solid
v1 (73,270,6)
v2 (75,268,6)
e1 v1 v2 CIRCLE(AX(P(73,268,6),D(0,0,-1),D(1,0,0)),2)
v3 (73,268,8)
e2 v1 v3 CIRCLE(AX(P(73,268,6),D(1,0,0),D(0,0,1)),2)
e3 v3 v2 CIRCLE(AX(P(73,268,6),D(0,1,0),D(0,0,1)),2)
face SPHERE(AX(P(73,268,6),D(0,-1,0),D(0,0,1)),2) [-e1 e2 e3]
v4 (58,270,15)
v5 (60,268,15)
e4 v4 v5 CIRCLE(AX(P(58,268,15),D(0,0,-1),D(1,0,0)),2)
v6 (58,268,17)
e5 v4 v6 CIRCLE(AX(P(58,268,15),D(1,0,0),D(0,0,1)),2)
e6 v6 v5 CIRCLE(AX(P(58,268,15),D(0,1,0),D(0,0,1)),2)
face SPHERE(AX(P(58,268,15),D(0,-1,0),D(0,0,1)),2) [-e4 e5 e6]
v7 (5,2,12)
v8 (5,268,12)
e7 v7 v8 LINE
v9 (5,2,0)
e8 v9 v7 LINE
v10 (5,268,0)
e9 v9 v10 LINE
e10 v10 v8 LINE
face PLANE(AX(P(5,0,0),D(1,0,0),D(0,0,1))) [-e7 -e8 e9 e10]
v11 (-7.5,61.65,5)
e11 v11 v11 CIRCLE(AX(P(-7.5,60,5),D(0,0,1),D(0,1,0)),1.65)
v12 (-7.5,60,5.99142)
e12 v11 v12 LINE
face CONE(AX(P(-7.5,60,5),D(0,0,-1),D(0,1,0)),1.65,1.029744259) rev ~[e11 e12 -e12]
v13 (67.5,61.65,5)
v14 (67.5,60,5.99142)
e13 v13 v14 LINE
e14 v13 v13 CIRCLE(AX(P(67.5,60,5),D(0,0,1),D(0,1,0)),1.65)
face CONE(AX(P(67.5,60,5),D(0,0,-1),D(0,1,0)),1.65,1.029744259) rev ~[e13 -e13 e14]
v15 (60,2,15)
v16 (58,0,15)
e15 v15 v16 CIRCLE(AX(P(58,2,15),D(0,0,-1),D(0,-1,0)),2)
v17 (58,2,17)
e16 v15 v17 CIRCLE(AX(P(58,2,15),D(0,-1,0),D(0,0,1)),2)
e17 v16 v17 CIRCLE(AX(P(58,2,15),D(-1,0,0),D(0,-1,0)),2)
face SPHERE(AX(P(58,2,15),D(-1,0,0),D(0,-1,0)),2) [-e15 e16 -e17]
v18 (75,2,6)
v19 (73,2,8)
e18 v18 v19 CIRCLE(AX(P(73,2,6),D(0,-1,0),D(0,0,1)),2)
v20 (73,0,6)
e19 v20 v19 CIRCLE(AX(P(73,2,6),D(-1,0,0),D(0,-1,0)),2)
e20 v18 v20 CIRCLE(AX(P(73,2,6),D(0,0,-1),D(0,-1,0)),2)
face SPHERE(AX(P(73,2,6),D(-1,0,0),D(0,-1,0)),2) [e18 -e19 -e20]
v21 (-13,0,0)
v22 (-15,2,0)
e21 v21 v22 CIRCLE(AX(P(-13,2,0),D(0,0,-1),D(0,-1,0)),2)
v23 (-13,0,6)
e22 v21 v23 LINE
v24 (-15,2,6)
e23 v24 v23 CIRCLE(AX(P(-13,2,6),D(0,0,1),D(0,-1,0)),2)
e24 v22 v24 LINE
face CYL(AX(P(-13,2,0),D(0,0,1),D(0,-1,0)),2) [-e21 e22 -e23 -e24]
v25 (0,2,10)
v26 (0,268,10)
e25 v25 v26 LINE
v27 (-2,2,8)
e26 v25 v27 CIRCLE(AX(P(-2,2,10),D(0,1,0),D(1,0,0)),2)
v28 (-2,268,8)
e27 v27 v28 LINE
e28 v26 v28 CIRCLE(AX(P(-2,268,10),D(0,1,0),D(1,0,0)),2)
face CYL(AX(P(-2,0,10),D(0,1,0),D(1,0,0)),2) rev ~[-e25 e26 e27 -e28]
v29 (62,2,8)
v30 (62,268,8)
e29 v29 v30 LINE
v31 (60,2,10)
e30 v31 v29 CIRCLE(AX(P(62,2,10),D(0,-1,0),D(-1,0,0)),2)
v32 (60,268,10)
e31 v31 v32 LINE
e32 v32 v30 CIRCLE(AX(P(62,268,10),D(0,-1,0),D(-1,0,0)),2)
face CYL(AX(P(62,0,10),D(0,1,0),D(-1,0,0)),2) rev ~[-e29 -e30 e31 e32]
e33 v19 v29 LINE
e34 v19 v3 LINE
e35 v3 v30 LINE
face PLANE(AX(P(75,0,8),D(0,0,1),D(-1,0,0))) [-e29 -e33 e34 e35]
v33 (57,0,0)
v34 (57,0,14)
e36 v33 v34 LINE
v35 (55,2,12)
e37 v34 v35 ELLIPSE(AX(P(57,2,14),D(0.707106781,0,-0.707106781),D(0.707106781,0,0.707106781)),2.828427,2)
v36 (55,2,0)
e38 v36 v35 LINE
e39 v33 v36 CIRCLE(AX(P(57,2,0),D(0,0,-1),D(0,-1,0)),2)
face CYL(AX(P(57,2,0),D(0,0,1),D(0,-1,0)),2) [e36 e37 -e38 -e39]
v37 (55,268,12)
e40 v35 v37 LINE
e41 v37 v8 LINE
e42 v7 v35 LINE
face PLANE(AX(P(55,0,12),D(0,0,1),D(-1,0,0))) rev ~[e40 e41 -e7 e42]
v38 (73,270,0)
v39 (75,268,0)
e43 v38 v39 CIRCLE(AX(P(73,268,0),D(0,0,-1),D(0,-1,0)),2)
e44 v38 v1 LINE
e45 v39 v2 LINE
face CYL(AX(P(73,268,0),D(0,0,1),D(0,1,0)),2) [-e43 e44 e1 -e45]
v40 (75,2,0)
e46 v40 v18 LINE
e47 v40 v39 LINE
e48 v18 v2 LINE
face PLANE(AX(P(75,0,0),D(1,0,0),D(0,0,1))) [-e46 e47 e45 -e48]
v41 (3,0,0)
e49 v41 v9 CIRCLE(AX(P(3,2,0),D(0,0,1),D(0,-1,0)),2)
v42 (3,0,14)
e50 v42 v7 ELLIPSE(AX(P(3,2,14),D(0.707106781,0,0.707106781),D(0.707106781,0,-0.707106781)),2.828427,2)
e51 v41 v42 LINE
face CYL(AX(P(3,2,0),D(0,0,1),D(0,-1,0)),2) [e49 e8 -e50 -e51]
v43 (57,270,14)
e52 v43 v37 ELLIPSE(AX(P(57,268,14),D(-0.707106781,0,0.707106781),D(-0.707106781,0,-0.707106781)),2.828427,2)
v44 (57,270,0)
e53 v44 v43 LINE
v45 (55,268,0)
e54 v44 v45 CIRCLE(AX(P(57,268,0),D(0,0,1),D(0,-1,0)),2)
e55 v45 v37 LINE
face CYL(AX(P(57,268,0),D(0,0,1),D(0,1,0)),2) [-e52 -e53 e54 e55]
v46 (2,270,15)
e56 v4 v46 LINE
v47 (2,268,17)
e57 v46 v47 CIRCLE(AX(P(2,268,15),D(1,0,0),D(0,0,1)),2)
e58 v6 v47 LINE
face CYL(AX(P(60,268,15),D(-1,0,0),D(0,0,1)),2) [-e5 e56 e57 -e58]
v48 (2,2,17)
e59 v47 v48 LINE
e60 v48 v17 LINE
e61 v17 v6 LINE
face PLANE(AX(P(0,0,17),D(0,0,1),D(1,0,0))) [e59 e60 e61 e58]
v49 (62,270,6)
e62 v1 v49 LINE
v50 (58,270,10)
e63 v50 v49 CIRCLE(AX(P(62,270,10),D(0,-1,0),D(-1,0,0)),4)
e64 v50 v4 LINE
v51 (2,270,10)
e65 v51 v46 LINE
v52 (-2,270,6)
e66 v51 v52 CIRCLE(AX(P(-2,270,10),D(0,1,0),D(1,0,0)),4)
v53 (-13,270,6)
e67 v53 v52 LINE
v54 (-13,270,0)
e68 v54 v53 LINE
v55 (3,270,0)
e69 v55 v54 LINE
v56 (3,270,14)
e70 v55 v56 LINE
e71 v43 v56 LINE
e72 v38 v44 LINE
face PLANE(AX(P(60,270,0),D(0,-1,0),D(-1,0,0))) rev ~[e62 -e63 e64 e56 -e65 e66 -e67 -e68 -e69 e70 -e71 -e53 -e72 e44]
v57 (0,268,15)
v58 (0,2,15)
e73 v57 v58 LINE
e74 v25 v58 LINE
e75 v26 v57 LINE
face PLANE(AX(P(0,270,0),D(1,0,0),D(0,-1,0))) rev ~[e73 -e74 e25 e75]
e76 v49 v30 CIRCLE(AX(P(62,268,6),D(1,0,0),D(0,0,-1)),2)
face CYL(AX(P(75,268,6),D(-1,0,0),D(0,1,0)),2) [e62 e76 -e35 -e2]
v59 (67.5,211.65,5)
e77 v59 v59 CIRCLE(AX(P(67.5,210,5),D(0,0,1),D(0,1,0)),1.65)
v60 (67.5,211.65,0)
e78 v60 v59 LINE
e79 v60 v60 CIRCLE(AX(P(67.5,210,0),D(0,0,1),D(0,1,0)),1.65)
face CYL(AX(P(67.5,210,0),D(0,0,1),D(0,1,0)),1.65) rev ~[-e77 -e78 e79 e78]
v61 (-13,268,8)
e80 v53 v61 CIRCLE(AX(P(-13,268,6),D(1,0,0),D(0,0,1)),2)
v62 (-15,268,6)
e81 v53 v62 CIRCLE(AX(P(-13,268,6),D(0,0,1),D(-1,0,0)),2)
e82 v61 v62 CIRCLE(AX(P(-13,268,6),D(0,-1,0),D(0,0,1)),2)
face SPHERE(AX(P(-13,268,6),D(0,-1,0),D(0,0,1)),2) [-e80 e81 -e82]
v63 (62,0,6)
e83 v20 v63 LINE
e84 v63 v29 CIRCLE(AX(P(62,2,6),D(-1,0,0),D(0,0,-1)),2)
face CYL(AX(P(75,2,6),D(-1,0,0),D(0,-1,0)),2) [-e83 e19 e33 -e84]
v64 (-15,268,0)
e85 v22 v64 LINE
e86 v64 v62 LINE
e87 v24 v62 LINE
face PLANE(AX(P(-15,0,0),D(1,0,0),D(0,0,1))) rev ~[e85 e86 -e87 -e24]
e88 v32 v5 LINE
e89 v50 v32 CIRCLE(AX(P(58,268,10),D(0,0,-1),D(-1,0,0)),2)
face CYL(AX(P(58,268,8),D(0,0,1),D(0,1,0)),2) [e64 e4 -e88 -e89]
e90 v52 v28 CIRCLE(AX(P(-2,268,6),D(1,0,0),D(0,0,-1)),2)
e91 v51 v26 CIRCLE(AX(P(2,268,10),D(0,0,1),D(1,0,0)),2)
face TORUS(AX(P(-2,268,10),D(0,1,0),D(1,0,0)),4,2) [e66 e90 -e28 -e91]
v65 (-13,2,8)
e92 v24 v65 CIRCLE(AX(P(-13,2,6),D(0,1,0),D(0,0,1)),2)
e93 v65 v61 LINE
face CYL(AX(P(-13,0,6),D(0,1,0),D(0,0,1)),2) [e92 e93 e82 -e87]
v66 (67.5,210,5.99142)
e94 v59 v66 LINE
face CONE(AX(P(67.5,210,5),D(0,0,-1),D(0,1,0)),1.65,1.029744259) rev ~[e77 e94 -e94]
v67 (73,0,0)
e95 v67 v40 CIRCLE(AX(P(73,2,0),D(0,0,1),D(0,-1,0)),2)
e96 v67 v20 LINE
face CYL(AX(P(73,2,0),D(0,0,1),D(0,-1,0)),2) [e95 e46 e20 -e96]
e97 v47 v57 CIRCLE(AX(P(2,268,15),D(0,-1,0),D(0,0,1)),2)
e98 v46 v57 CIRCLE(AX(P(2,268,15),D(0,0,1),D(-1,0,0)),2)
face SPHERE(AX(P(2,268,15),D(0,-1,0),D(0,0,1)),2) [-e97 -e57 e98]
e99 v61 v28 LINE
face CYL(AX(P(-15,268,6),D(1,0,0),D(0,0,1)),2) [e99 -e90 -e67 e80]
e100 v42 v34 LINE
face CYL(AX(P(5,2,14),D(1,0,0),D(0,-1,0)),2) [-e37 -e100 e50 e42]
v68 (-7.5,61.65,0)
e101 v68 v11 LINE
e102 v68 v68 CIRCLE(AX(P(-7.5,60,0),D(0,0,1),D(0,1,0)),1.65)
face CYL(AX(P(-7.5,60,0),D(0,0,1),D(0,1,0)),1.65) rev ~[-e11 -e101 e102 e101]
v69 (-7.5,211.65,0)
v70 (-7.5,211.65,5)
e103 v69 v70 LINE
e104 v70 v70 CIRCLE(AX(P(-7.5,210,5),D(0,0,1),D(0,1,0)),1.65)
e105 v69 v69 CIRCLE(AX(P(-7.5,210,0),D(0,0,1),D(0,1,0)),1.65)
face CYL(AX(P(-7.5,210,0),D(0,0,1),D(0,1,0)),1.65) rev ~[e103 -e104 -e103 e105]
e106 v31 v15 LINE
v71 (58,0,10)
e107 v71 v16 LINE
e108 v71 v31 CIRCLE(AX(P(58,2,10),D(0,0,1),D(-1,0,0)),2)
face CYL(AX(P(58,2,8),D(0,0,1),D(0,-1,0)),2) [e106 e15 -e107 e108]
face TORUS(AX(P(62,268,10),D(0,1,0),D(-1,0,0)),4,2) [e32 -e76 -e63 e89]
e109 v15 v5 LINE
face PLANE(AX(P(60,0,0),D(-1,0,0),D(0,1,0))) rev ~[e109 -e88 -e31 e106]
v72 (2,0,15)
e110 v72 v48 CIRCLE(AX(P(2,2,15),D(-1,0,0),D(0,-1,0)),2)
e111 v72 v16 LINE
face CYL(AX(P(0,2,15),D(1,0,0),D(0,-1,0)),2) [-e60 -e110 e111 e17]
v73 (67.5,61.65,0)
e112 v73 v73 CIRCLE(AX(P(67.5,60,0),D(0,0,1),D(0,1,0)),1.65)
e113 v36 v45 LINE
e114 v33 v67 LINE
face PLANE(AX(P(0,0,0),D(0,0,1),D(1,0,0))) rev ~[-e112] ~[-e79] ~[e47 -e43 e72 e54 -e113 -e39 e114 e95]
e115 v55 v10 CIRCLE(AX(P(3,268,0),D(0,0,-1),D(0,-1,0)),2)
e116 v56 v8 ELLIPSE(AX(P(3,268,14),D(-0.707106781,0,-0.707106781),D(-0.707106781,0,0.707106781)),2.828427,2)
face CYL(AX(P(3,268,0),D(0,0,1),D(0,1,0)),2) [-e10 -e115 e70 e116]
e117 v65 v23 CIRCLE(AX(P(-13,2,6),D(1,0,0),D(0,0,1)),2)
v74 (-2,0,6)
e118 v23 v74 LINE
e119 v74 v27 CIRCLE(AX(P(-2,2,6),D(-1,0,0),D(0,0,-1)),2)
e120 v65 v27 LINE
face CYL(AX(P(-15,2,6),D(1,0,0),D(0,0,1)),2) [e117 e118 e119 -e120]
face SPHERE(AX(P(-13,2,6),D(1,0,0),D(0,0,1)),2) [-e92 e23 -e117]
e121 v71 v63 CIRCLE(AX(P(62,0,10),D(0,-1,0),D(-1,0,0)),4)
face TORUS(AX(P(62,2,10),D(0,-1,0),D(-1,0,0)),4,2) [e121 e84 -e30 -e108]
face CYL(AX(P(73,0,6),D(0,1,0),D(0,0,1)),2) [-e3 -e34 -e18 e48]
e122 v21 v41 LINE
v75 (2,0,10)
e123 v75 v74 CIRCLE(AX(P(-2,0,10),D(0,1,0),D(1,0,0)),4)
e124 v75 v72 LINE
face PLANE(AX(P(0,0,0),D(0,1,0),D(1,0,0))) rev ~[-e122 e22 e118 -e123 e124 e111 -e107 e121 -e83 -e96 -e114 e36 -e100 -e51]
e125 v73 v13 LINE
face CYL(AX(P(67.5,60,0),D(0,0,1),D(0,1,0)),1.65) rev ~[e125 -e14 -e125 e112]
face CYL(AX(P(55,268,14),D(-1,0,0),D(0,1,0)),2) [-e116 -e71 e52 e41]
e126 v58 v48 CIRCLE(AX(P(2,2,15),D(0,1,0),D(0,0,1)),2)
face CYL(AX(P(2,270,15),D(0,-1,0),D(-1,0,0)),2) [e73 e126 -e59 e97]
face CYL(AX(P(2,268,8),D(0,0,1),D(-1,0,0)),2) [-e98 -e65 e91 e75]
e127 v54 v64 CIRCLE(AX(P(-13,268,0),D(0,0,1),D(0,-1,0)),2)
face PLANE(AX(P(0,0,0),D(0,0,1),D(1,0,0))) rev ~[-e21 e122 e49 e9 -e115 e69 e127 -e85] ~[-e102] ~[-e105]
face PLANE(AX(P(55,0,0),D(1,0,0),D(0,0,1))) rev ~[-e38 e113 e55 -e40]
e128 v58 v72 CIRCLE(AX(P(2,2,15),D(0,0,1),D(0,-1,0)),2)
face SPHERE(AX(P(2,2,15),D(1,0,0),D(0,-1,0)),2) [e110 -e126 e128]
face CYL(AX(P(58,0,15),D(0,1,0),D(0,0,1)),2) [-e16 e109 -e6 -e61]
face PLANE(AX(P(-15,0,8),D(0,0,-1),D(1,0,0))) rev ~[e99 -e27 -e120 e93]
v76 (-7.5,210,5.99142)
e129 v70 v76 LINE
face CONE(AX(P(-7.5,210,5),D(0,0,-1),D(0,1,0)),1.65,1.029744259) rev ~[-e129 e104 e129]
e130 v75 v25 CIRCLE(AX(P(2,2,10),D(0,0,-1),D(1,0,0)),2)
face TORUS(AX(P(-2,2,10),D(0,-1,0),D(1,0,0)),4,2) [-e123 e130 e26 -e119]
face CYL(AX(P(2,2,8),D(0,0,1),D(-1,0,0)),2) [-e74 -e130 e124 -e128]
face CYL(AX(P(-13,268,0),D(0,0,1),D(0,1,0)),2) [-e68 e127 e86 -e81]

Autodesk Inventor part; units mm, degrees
ref_plane "YZ Plane" through (0, 0, 0) normal (1, 0, 0) x (0, 1, 0)
sketch "スケッチ1" plane through (0, 0, 0) normal (0, 0, 1) x (1, 0, 0)
  line L0 (0, 0) -> (60, 0)
  line L1 (60, 0) -> (60, 270)
  line L2 (60, 270) -> (0, 270)
  line L3 (0, 270) -> (0, 0)
  dimension "d0" = 270
  dimension "d1" = 60
extrude "押し出し1" add sketch "スケッチ1" along normal blind 17
ref_plane "作業平面1" through (30, 0, 0) normal (1, 0, 0) x (0, 0, -1)
ref_plane "作業平面2" through (0, 135, 0) normal (0, -1, 0) x (1, 0, 0)
sketch "スケッチ2" plane through (0, 0, 0) normal (0, -1, 0) x (1, 0, 0)
  line L0 (30, 24) -> (30, -4) projected
  line L1 (60, 0) -> (0, 0) projected
  line L2 (30, 0) -> (5, 0)
  line L3 (5, 0) -> (5, 12)
  line L4 (5, 12) -> (30, 12)
  line L5 (30, 12) -> (30, 0)
  line L6 (0, 17) -> (60, 17) projected
  line L7 (0, 0) -> (0, 17) projected
  line L8 (55, 0) -> (55, 12)
  line L9 (55, 12) -> (30, 12)
  point P0 (5, 0)
  dimension "d4" = 5
  dimension "d5" = 5
extrude "押し出し2" cut sketch "スケッチ2" against normal through all contours L9 L8 L1 L0 | L0 L1 L3 L4
sketch "スケッチ3" plane through (0, 0, 17) normal (0, -1, 0) x (1, 0, 0)
  line L0 (5, -17) -> (0, -17) projected
  line L1 (0, -17) -> (-15, -17)
  line L2 (-15, -17) -> (-15, -9)
  line L3 (-15, -9) -> (0, -9)
  line L4 (0, -9) -> (0, -17)
  line L5 (30, 3.4) -> (30, -20.4) projected
  line L6 (60, -17) -> (75, -17)
  line L7 (75, -17) -> (75, -9)
  line L8 (75, -9) -> (60, -9)
  line L9 (60, -9) -> (60, -17)
  dimension "d8" = 8
  dimension "d9" = 15
extrude "押し出し3" add sketch "スケッチ3" against normal up to surface (270 mm away)
sketch "スケッチ4" plane through (0, 0, 0) normal (0, 0, 1) x (1, 0, 0)
  line L0 (-15, 0) -> (5, 0) projected
  line L1 (-15, 0) -> (-15, 270) projected
  line L2 (30, 324) -> (30, -54) projected
  line L3 (93, 135) -> (-33, 135) projected
  point P0 (0, 0)
  point P1 (-7.5, 60)
  point P2 (-7.5, 210)
  point P3 (67.5, 60)
  point P4 (67.5, 210)
  dimension "d12" = 60
  dimension "d13" = 7.5
hole "穴1" at (-7.5, 60, 0) at (-7.5, 210, 0) at (67.5, 60, 0) at (67.5, 210, 0) direction (0, 0, 1) diameter 3.3 depth 5 tip angle 118
fillet "フィレット1" radius 2 26 edges at (30, 0, 17) (30, 0, 12) (5, 0, 6) (55, 0, 6) (60, 0, 12.5) (60, 135, 17) (67.5, 0, 8) (75, 0, 4) (75, 135, 8) (0, 0, 12.5) (-7.5, 0, 8) (-15, 135, 8) (-15, 0, 4) (0, 135, 17) (0, 135, 8) (60, 135, 8) (30, 270, 17) (0, 270, 12.5) (60, 270, 12.5) (67.5, 270, 8) (-7.5, 270, 8) (75, 270, 4) (-15, 270, 4) (30, 270, 12) (55, 270, 6) (5, 270, 6)
properties part number "CableCover"
